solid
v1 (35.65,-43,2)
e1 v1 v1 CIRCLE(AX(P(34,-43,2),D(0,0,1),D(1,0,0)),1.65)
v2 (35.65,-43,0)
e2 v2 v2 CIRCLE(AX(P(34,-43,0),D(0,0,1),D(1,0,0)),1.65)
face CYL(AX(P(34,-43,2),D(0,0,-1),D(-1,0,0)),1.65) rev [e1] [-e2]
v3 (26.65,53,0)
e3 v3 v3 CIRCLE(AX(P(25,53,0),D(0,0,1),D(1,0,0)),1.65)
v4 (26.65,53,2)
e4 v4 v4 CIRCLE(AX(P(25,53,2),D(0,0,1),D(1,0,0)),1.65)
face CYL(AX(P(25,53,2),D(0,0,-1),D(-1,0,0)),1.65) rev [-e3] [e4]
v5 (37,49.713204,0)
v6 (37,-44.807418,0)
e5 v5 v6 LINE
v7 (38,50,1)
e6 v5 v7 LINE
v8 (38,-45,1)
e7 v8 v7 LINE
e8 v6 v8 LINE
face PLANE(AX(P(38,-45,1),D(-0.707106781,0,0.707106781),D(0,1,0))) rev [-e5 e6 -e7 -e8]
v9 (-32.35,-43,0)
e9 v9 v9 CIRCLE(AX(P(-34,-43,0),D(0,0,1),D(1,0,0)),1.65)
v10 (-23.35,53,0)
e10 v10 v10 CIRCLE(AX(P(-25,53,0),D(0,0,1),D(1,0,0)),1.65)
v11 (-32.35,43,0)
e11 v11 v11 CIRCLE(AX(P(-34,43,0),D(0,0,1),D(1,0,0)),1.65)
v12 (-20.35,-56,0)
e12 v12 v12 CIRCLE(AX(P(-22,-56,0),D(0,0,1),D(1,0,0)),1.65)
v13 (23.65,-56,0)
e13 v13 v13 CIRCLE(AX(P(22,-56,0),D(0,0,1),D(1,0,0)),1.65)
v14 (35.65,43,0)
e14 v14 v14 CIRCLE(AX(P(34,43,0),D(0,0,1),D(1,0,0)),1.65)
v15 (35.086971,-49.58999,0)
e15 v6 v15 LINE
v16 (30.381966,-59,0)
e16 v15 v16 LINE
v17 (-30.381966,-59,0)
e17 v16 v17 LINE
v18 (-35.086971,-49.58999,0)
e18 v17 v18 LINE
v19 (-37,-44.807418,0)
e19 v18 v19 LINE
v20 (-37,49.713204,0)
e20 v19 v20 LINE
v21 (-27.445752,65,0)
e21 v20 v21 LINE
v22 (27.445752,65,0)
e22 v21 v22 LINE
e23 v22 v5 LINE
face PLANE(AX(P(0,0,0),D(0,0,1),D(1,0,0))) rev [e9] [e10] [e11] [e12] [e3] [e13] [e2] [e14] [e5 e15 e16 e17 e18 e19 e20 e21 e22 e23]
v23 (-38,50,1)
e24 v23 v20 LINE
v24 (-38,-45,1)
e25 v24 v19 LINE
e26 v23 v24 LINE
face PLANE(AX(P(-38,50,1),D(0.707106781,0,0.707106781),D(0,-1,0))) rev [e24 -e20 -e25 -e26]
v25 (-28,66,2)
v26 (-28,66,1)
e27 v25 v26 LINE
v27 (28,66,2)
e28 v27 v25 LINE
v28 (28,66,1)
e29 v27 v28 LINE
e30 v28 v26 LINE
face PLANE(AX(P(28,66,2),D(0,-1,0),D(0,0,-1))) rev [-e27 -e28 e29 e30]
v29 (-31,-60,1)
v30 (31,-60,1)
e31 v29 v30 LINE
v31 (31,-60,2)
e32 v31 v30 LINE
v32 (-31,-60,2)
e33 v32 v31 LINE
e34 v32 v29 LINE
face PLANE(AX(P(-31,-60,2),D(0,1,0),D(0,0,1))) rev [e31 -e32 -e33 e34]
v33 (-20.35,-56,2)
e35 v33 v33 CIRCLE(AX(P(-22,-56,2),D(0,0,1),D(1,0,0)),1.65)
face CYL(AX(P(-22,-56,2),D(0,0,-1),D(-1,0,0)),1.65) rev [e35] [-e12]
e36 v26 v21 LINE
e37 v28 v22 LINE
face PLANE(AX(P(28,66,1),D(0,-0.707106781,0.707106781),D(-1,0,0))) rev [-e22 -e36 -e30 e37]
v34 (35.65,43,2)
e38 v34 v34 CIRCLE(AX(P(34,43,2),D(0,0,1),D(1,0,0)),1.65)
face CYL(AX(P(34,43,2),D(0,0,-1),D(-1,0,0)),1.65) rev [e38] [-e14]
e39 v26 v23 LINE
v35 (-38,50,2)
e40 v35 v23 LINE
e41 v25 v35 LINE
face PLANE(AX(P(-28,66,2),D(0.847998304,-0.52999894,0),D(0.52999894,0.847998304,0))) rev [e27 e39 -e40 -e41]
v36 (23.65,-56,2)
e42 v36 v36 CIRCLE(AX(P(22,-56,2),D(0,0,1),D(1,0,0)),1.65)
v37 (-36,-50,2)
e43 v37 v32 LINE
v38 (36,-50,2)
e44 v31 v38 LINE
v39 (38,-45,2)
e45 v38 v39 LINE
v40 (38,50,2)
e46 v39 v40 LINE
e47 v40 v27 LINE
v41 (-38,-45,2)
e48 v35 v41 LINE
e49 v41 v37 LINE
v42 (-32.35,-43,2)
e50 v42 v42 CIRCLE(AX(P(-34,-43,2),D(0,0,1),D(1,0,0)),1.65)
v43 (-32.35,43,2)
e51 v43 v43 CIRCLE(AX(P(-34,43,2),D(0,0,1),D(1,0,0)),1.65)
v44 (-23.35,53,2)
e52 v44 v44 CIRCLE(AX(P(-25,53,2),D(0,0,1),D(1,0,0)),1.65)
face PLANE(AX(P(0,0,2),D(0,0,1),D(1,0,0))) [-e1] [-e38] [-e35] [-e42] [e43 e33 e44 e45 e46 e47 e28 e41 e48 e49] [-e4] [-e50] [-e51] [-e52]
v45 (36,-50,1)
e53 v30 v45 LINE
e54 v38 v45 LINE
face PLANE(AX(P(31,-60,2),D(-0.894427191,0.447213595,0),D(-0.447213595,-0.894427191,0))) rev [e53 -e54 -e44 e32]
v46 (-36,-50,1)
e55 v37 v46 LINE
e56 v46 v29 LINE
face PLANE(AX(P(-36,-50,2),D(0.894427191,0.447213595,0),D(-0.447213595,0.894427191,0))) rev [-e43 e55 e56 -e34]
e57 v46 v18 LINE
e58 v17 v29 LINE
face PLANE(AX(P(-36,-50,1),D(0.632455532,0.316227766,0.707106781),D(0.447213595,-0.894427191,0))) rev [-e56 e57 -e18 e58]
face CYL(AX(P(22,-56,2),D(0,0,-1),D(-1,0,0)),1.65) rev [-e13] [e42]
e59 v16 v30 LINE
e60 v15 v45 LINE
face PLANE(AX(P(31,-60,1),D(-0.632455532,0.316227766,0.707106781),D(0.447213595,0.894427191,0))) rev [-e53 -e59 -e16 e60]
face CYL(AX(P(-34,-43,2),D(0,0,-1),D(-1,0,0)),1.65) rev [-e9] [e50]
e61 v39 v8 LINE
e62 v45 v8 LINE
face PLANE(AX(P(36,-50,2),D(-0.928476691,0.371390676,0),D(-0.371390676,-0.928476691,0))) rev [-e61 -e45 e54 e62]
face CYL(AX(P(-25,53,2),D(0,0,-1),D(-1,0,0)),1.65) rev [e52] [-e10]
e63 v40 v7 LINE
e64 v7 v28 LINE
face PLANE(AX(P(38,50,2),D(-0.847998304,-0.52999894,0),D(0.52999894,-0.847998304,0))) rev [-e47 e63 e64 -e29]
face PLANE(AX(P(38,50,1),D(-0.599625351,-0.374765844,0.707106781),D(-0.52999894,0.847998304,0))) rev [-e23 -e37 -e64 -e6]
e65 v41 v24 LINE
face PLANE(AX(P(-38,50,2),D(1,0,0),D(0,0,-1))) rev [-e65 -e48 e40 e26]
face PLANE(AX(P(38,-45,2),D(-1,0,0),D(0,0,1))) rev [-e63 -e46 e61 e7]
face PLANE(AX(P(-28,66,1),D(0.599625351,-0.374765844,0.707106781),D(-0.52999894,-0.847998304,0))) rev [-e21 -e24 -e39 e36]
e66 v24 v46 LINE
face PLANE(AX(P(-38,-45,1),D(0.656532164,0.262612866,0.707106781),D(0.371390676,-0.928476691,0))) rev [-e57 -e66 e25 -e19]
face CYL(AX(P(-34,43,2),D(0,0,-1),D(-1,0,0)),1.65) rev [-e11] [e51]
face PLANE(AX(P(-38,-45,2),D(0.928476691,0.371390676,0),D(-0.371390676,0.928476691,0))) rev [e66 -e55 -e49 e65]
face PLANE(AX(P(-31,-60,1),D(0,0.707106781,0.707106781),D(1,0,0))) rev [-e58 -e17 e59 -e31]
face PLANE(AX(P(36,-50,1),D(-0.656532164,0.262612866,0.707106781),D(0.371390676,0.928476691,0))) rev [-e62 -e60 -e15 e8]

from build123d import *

# Parameters (mm, degrees)
SKETCH_3_R        = 1.65
EXTRUDE_242_DEPTH = 2
CHAMFER_C1_SIZE   = 1


with BuildPart() as part:
    # 草图3 → Extrude 242 (new body)
    with BuildSketch(Plane.XY):
        Polygon((-31, -60), (31, -60), (36, -50), (38, -45), (38, 50), (28, 66), (-28, 66), (-38, 50), (-38, -45), (-36, -50), align=None)
        with Locations((-22, -56)):
            Circle(SKETCH_3_R, mode=Mode.SUBTRACT)
        with Locations((-25, 53)):
            Circle(SKETCH_3_R, mode=Mode.SUBTRACT)
        with Locations((-34, -43)):
            Circle(SKETCH_3_R, mode=Mode.SUBTRACT)
        with Locations((-34, 43)):
            Circle(SKETCH_3_R, mode=Mode.SUBTRACT)
        with Locations((22, -56)):
            Circle(SKETCH_3_R, mode=Mode.SUBTRACT)
        with Locations((25, 53)):
            Circle(SKETCH_3_R, mode=Mode.SUBTRACT)
        with Locations((34, -43)):
            Circle(SKETCH_3_R, mode=Mode.SUBTRACT)
        with Locations((34, 43)):
            Circle(SKETCH_3_R, mode=Mode.SUBTRACT)
    extrude(amount=EXTRUDE_242_DEPTH)

    # 底盖全周向心倒角_C1
    # the kernel refuses this chamfer: 1 mm, written as the material it takes off along each edge
    with BuildSketch(Plane(origin=(-38.955099084, -42.612252289, 0), x_dir=(-0.02552928052838921, -0.010211712211355682, 0.9996219169112968), z_dir=(0.3713906763541037, -0.9284766908852594, 0)), Plane(origin=(35.044900916, -52.387747711, 0), x_dir=(0.025529280528384445, -0.010211712211353776, 0.9996219169112968), z_dir=(0.3713906763541037, 0.9284766908852594, 0))) as chamfer_c1_piece_1:
        Polygon((CHAMFER_C1_SIZE * 0.999621916911, -CHAMFER_C1_SIZE * 0.0274958766106), (-CHAMFER_C1_SIZE * 0.0274958766106, -CHAMFER_C1_SIZE * 0.999621916911), (0, 0), align=None)
    extrude(amount=10.528530783, mode=Mode.SUBTRACT)
    with BuildSketch(Plane(origin=(-38, 52.571682988, 0), x_dir=(-0.02749587661058908, 0, 0.9996219169112968), z_dir=(0, -1, 0)), Plane(origin=(38, -47.571682988, 0), x_dir=(0.02749587661058908, 0, 0.9996219169112968), z_dir=(0, 1, 0))) as chamfer_c1_piece_2:
        Polygon((CHAMFER_C1_SIZE * 0.999621916911, -CHAMFER_C1_SIZE * 0.0274958766106), (-CHAMFER_C1_SIZE * 0.0274958766106, -CHAMFER_C1_SIZE * 0.999621916911), (0, 0), align=None)
    extrude(amount=100.143365976, mode=Mode.SUBTRACT)
    with BuildSketch(Plane(origin=(-26.637010742, 68.180782812, 0), x_dir=(-0.023316456732911925, 0.014572785458069957, 0.9996219169112968), z_dir=(-0.52999894000318, -0.847998304005088, 0)), Plane(origin=(39.362989258, 47.819217188, 0), x_dir=(0.023316456732909444, 0.014572785458068402, 0.9996219169112968), z_dir=(-0.52999894000318, 0.847998304005088, 0))) as chamfer_c1_piece_3:
        Polygon((CHAMFER_C1_SIZE * 0.999621916911, -CHAMFER_C1_SIZE * 0.0274958766106), (-CHAMFER_C1_SIZE * 0.0274958766106, -CHAMFER_C1_SIZE * 0.999621916911), (0, 0), align=None)
    extrude(amount=24.01132824, mode=Mode.SUBTRACT)
    with BuildSketch(Plane(origin=(30.571682988, 66, 0), x_dir=(0, 0.027495876610582174, 0.9996219169112968), z_dir=(-1, 0, 0))) as chamfer_c1_piece_4:
        Polygon((CHAMFER_C1_SIZE * 0.999621916911, -CHAMFER_C1_SIZE * 0.0274958766106), (-CHAMFER_C1_SIZE * 0.0274958766106, -CHAMFER_C1_SIZE * 0.999621916911), (0, 0), align=None)
    extrude(amount=61.143365976, mode=Mode.SUBTRACT)
    with BuildSketch(Plane(origin=(29.849908404, -62.300183191, 0), x_dir=(0.02459305968088644, -0.01229652984044322, 0.9996219169112968), z_dir=(0.447213595499958, 0.894427190999916, 0)), Plane(origin=(-37.150091596, -47.699816809, 0), x_dir=(-0.024593059680886434, -0.012296529840443217, 0.9996219169112968), z_dir=(0.447213595499958, -0.894427190999916, 0))) as chamfer_c1_piece_5:
        Polygon((CHAMFER_C1_SIZE * 0.999621916911, -CHAMFER_C1_SIZE * 0.0274958766106), (-CHAMFER_C1_SIZE * 0.0274958766106, -CHAMFER_C1_SIZE * 0.999621916911), (0, 0), align=None)
    extrude(amount=16.323705863, mode=Mode.SUBTRACT)
    with BuildSketch(Plane(origin=(-33.571682988, -60, 0), x_dir=(0, -0.02749587661058908, 0.9996219169112968), z_dir=(1, 0, 0))) as chamfer_c1_piece_6:
        Polygon((CHAMFER_C1_SIZE * 0.999621916911, -CHAMFER_C1_SIZE * 0.0274958766106), (-CHAMFER_C1_SIZE * 0.0274958766106, -CHAMFER_C1_SIZE * 0.999621916911), (0, 0), align=None)
    extrude(amount=67.143365976, mode=Mode.SUBTRACT)


solid = part.part
